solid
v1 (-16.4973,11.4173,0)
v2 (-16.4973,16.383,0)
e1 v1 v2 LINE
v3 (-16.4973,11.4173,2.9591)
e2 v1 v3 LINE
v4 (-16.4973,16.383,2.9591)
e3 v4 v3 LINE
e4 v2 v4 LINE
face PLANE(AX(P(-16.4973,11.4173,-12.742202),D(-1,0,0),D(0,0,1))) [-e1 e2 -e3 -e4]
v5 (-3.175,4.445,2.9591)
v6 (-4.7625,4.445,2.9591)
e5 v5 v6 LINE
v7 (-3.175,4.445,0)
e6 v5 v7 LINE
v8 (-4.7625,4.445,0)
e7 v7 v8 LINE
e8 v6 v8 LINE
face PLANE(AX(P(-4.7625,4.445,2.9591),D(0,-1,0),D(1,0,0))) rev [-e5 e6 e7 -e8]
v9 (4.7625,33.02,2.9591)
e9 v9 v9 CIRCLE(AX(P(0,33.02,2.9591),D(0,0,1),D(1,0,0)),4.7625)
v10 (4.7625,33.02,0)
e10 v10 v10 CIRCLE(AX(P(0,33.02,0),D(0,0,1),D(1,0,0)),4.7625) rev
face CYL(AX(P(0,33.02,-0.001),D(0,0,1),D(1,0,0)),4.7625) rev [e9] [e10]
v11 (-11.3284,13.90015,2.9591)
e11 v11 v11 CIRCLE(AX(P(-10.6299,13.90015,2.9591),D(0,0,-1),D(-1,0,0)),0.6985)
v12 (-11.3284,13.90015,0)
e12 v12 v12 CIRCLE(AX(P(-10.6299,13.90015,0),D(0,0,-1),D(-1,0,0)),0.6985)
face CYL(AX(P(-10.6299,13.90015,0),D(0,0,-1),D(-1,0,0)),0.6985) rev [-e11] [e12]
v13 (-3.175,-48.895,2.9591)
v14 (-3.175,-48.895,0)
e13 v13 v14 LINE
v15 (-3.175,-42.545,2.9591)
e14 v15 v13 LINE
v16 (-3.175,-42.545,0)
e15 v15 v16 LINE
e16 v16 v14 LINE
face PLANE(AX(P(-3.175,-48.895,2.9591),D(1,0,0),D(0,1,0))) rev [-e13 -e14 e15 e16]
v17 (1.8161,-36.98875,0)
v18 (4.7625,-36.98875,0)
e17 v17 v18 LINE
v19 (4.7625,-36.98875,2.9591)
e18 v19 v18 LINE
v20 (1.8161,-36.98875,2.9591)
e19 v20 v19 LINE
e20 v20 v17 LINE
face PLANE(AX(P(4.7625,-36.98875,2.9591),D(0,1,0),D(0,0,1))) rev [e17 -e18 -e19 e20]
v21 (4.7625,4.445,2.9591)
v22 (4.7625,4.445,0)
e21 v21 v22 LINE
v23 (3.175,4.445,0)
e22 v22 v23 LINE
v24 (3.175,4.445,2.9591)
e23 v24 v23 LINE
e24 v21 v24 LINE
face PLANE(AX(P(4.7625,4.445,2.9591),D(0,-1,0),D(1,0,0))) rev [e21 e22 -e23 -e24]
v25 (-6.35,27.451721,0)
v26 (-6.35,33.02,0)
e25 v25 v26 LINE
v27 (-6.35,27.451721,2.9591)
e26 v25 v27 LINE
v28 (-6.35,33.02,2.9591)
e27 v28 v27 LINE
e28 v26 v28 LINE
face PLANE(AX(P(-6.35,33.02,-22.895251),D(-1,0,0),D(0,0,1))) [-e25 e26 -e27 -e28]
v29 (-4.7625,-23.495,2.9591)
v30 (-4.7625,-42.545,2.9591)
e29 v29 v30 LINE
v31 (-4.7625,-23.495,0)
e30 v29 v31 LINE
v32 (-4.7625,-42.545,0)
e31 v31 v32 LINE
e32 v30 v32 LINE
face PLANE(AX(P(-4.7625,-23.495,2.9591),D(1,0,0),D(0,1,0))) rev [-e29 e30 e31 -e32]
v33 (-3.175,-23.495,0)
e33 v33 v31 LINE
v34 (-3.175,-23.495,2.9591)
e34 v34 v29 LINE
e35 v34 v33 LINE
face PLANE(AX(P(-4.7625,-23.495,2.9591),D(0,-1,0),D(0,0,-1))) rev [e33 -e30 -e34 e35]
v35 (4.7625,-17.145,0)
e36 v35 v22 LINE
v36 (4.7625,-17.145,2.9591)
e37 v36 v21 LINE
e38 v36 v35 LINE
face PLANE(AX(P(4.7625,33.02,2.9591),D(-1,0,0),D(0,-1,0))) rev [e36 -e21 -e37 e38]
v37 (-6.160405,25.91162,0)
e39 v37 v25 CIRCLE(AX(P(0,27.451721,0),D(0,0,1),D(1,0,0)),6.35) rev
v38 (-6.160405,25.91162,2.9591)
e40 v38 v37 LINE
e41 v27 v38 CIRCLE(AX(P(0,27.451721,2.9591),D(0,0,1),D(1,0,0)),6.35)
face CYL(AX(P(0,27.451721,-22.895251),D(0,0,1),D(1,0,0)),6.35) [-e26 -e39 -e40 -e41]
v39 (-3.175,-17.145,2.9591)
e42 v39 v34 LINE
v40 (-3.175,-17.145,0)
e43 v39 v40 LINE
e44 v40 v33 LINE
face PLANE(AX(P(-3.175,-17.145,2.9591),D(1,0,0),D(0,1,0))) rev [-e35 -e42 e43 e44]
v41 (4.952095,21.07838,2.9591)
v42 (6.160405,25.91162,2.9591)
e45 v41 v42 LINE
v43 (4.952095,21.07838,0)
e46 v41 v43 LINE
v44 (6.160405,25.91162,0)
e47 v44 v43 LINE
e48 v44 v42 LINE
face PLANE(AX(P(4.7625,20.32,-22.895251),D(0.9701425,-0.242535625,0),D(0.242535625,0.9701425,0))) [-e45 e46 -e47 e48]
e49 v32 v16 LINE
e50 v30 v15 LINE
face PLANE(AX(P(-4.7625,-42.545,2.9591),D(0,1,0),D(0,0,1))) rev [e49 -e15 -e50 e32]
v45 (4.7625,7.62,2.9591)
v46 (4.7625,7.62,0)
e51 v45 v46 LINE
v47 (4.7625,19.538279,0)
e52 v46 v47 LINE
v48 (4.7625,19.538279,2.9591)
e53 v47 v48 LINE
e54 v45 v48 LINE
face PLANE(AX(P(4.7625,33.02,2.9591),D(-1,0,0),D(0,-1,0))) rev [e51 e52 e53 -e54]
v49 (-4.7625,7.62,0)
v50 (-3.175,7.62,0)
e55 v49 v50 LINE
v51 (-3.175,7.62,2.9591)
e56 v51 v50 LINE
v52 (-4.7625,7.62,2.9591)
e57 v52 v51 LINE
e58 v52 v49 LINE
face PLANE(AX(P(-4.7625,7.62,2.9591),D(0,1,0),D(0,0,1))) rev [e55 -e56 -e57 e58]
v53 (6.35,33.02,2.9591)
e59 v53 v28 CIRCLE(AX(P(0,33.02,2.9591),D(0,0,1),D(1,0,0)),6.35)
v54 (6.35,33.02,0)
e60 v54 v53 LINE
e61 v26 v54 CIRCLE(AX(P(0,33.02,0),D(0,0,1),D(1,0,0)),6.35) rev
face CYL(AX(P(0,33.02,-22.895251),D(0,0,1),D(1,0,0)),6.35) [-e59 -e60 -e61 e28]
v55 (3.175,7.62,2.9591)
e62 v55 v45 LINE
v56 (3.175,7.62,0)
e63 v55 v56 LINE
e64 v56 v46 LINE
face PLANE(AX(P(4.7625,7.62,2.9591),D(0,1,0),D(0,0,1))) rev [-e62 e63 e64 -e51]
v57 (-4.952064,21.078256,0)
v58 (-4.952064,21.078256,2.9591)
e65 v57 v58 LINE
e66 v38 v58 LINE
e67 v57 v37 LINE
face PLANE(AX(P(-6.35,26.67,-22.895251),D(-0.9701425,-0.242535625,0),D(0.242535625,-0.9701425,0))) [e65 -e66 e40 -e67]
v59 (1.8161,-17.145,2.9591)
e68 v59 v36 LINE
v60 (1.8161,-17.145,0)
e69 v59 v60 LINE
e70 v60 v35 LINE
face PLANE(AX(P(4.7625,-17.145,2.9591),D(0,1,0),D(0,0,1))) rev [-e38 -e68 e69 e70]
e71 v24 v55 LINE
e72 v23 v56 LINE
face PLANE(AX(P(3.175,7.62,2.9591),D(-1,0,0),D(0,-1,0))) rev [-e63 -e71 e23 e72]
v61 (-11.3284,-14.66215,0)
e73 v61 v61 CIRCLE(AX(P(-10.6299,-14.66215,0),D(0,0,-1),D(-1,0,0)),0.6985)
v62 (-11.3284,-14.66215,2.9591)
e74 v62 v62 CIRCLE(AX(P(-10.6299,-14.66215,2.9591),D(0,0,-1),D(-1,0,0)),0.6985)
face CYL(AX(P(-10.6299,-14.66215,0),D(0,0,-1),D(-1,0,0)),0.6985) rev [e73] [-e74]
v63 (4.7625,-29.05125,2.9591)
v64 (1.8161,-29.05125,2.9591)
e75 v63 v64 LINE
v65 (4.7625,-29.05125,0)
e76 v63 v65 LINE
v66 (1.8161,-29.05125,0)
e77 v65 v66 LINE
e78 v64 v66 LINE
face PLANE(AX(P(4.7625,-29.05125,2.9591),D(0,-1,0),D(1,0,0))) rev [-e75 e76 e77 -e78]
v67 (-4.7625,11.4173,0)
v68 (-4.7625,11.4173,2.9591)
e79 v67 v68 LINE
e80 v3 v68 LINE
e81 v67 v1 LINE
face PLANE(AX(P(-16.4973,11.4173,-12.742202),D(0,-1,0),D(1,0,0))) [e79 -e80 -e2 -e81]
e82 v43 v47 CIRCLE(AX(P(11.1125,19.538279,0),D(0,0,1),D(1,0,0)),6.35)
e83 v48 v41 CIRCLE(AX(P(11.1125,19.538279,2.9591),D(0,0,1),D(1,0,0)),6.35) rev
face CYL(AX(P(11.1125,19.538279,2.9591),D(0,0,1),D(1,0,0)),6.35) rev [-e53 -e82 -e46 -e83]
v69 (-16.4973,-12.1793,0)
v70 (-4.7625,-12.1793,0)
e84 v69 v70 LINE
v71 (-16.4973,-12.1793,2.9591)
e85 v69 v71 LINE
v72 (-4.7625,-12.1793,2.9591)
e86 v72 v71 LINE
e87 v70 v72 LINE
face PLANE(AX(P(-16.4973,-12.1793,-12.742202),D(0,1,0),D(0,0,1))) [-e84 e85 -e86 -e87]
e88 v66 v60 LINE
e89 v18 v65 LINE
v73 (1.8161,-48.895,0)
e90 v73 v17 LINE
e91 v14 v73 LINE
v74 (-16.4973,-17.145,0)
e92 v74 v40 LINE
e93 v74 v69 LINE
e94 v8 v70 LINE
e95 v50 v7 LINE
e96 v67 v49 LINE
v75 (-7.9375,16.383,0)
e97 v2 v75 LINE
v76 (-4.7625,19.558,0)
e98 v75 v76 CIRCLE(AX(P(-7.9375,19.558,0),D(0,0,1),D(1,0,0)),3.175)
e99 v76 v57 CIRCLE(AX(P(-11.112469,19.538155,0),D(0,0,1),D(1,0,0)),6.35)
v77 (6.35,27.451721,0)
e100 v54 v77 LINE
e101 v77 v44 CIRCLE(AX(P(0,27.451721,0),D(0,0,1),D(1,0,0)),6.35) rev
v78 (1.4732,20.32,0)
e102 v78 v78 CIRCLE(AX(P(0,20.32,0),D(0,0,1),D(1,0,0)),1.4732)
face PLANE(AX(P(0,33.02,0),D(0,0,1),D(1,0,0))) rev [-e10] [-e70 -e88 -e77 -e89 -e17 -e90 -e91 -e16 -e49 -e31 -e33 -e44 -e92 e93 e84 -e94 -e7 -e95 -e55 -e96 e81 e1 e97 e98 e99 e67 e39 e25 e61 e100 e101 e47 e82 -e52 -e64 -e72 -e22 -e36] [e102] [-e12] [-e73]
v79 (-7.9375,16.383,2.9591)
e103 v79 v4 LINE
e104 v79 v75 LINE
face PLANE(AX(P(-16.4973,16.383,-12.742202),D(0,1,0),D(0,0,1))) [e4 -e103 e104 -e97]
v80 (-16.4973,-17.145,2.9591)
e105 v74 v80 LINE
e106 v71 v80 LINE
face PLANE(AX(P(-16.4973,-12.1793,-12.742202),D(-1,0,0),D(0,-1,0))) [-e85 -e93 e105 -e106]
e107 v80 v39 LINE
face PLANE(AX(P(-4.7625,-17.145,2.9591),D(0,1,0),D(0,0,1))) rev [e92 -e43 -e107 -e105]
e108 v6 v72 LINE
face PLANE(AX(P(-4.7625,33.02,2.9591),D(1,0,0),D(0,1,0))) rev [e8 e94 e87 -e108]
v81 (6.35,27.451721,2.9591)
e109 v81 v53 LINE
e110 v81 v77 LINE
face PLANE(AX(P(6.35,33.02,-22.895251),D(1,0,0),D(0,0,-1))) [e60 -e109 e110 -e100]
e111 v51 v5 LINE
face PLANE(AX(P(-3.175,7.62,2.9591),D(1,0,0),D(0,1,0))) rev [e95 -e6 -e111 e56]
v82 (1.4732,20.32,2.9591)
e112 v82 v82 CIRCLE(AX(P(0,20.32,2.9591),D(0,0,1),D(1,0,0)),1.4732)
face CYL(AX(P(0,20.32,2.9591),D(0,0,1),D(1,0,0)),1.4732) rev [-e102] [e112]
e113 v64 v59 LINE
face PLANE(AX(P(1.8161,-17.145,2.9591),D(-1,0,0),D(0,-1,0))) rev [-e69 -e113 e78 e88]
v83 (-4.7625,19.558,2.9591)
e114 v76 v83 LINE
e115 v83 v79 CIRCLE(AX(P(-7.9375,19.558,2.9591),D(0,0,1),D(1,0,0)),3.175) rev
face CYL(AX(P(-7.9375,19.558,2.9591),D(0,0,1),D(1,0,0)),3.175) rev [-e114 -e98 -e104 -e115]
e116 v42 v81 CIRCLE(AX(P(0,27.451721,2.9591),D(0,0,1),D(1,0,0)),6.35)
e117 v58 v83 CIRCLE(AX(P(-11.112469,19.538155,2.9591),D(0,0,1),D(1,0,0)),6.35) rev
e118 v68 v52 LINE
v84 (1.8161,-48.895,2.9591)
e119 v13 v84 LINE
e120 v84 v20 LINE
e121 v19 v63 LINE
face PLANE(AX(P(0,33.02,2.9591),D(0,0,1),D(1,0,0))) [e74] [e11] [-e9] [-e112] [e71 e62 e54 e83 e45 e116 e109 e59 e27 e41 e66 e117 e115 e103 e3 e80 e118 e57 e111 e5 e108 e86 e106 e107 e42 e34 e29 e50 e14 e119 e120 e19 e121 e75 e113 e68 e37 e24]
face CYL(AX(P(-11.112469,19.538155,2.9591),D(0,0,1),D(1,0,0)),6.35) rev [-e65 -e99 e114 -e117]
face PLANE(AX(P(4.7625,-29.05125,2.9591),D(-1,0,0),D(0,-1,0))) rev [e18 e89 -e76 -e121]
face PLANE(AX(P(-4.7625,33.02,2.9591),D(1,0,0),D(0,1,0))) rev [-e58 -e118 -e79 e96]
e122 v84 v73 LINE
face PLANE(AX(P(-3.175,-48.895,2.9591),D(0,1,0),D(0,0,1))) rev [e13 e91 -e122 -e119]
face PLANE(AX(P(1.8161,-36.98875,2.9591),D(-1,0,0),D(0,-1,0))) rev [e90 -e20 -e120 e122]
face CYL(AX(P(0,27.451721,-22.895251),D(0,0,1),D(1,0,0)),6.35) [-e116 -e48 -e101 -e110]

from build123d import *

# Parameters (mm, degrees)
SKETCH1_R             = 3.175
BOSS_EXTRUDE1_DEPTH   = 2.9591
SKETCH8_W             = 1.5875
SKETCH8_H             = 3.175
CUT_EXTRUDE4_DEPTH    = 50.215431564
SKETCH4_W             = 11.7348
SKETCH4_H             = 4.9657
BOSS_EXTRUDE2_DEPTH   = 2.9591
FILLET1_R             = 3.175
F_0_CLEARANCE_HOLE1_D = 1.397
F_4_CLEARANCE_HOLE1_D = 2.9464
BOSS_EXTRUDE3_START   = -2.9591
BOSS_EXTRUDE3_DEPTH   = 2.9591
FILLET2_R             = 6.35
CUT_EXTRUDE5_REACH    = 53.688
SKETCH12_R            = 4.7625


with BuildPart() as part:
    # Sketch1 → Boss-Extrude1 (new body)
    with BuildSketch(Plane.XY):
        with BuildLine():
            Line((4.7625, 33.02), (4.7625, -17.145))
            Line((4.7625, -17.145), (1.8161, -17.145))
            Line((1.8161, -17.145), (1.8161, -29.05125))
            Line((1.8161, -29.05125), (4.7625, -29.05125))
            Line((4.7625, -29.05125), (4.7625, -36.98875))
            Line((4.7625, -36.98875), (1.8161, -36.98875))
            Line((1.8161, -36.98875), (1.8161, -48.895))
            Line((1.8161, -48.895), (-3.175, -48.895))
            Line((-3.175, -48.895), (-3.175, -42.545))
            Line((-3.175, -42.545), (-4.7625, -42.545))
            Line((-4.7625, -42.545), (-4.7625, -23.495))
            Line((-4.7625, -23.495), (-3.175, -23.495))
            Line((-3.175, -23.495), (-3.175, -17.145))
            Line((-3.175, -17.145), (-4.7625, -17.145))
            Line((-4.7625, -17.145), (-4.7625, 33.02))
            ThreePointArc((-4.7625, 33.02), (0, 37.7825), (4.7625, 33.02))
        make_face()
        with Locations((0, 33.02)):
            Circle(SKETCH1_R, mode=Mode.SUBTRACT)
    extrude(amount=BOSS_EXTRUDE1_DEPTH)

    # Sketch8 → Cut-Extrude4 (cut, through all)
    with BuildSketch(Plane(origin=(0, 0, 0), x_dir=(-1, 0, 0), z_dir=(0, 0, -1))):
        with Locations((-3.96875, 6.0325)):
            Rectangle(SKETCH8_W, SKETCH8_H)
        with Locations((3.96875, 6.0325)):
            Rectangle(SKETCH8_W, SKETCH8_H)
    extrude(amount=-CUT_EXTRUDE4_DEPTH, mode=Mode.SUBTRACT)

    # Sketch4 → Boss-Extrude2 (add)
    with BuildSketch(Plane.XY.offset(2.9591)):
        with Locations((-10.6299, 13.90015)):
            Rectangle(SKETCH4_W, SKETCH4_H)
        with Locations((-10.6299, -14.66215)):
            Rectangle(SKETCH4_W, SKETCH4_H)
    extrude(amount=-BOSS_EXTRUDE2_DEPTH)

    # Fillet1
    fillet1_edges = [part.edges().sort_by_distance(p)[0] for p in [
        (-4.7625, 16.383, 1.47955),
    ]]
    fillet(fillet1_edges, radius=FILLET1_R)

    # #0 Clearance Hole1 (through all)
    with Locations(Plane(origin=(0, 0, 0), x_dir=(-1, 0, 0), z_dir=(0, 0, -1))):
        with Locations((10.6299, 13.90015), (10.6299, -14.66215)):
            Hole(F_0_CLEARANCE_HOLE1_D / 2)

    # #4 Clearance Hole1 (through all)
    with Locations(Plane.XY.offset(2.9591)):
        with Locations((0, 20.32)):
            Hole(F_4_CLEARANCE_HOLE1_D / 2)

    # Sketch11 → Boss-Extrude3 (add)
    with BuildSketch(Plane.XY.offset(2.9591).offset(BOSS_EXTRUDE3_START)):
        with BuildLine():
            Line((-6.35, 33.02), (-6.35, 26.67))
            Line((-6.35, 26.67), (-4.7625, 20.32))
            Line((-4.7625, 20.32), (-4.7625, 33.02))
            ThreePointArc((-4.7625, 33.02), (0, 37.7825), (4.7625, 33.02))
            Line((4.7625, 33.02), (4.7625, 20.32))
            Line((4.7625, 20.32), (6.35, 26.67))
            Line((6.35, 26.67), (6.35, 33.02))
            ThreePointArc((6.35, 33.02), (0, 39.37), (-6.35, 33.02))
        make_face()
    extrude(amount=BOSS_EXTRUDE3_DEPTH)

    # Fillet2
    # the kernel refuses this fillet: 6.35 mm, written as the material it adds along each edge
    with BuildSketch(Plane(origin=(4.7625, 20.32, 0), x_dir=(0, -1, 0), z_dir=(0, 0, 1))) as fillet2_piece_1:
        with BuildLine():
            CenterArc((FILLET2_R * 0.123105625618, FILLET2_R), FILLET2_R, 255.963756532, 14.036243468)
            Line((-FILLET2_R * 0.119429999419, FILLET2_R * 0.0298574998547), (0, 0))
            Line((0, 0), (FILLET2_R * 0.123105625618, 0))
        make_face()
    extrude(amount=2.9591)
    with BuildSketch(Plane(origin=(-4.7625, 20.32, 0), x_dir=(-8.465505129601726e-05, -0.9999999964167612, 0), z_dir=(0, 0, 1))) as fillet2_piece_2_section:
        with BuildLine():
            CenterArc((0.78250954, -6.349870963), FILLET2_R, 90.365265554, 13.675828291)
            Line((-0.758113183, -0.189596486), (-0.912175455, 0.426430961))
            Line((-0.912175455, 0.426430961), (-0.154062272, 0.616027448))
            Line((-0.154062272, 0.616027448), (-5.3756e-05, 0.634999998))
            ThreePointArc((-5.3756e-05, 0.634999998), (0.761946241, 0.635064505), (0.737979862, 0.634987096))
            Line((0.737979862, 0.634987096), (0.742028014, 0))
        make_face()
    fillet2_piece_2 = extrude(amount=2.9591, mode=Mode.PRIVATE)
    fillet2_piece_2 = split(fillet2_piece_2, bisect_by=Plane(origin=(-4.799885723, 7.62, 1.47955), z_dir=(0, 1, 0)), keep=Keep.TOP, mode=Mode.PRIVATE)
    fillet2_piece_2 = split(fillet2_piece_2, bisect_by=Plane(origin=(-3.175, 20.335301711, 1.47955), z_dir=(-1, 0, 0)), keep=Keep.TOP, mode=Mode.PRIVATE)
    add(fillet2_piece_2)
    # the kernel refuses this fillet: 6.35 mm, written as the material it takes off along each edge
    with BuildSketch(Plane(origin=(6.35, 26.67, -1.954301807), x_dir=(0, 1, 0), z_dir=(0, 0, 1))) as fillet2_2_piece_1:
        with BuildLine():
            CenterArc((FILLET2_R * 0.123105625618, FILLET2_R), FILLET2_R, 255.963756532, 14.036243468)
            Line((-FILLET2_R * 0.119429999419, FILLET2_R * 0.0298574998547), (0, 0))
            Line((0, 0), (FILLET2_R * 0.123105625618, 0))
        make_face()
    extrude(amount=6.867703613, mode=Mode.SUBTRACT)
    with BuildSketch(Plane(origin=(-6.35, 26.67, -1.954301807), x_dir=(0, 1, 0), z_dir=(0, 0, 1))) as fillet2_2_piece_2:
        with BuildLine():
            CenterArc((FILLET2_R * 0.123105625618, -FILLET2_R), FILLET2_R, 90, 14.036243468)
            Line((-FILLET2_R * 0.119429999419, -FILLET2_R * 0.0298574998547), (0, 0))
            Line((0, 0), (FILLET2_R * 0.123105625618, 0))
        make_face()
    extrude(amount=6.867703613, mode=Mode.SUBTRACT)

    # Sketch12 → Cut-Extrude5 (cut, up to next)
    with BuildSketch(Plane.XY.offset(2.9591), mode=Mode.PRIVATE) as cut_extrude5_sk1:
        with Locations((0, 33.02)):
            Circle(SKETCH12_R)
    cut_extrude5_tool1 = extrude(cut_extrude5_sk1.sketch, amount=-CUT_EXTRUDE5_REACH, mode=Mode.PRIVATE) & part.part
    add(cut_extrude5_tool1.solids().sort_by_distance((0, 33.02, 2.9591))[0], mode=Mode.SUBTRACT)


solid = part.part
